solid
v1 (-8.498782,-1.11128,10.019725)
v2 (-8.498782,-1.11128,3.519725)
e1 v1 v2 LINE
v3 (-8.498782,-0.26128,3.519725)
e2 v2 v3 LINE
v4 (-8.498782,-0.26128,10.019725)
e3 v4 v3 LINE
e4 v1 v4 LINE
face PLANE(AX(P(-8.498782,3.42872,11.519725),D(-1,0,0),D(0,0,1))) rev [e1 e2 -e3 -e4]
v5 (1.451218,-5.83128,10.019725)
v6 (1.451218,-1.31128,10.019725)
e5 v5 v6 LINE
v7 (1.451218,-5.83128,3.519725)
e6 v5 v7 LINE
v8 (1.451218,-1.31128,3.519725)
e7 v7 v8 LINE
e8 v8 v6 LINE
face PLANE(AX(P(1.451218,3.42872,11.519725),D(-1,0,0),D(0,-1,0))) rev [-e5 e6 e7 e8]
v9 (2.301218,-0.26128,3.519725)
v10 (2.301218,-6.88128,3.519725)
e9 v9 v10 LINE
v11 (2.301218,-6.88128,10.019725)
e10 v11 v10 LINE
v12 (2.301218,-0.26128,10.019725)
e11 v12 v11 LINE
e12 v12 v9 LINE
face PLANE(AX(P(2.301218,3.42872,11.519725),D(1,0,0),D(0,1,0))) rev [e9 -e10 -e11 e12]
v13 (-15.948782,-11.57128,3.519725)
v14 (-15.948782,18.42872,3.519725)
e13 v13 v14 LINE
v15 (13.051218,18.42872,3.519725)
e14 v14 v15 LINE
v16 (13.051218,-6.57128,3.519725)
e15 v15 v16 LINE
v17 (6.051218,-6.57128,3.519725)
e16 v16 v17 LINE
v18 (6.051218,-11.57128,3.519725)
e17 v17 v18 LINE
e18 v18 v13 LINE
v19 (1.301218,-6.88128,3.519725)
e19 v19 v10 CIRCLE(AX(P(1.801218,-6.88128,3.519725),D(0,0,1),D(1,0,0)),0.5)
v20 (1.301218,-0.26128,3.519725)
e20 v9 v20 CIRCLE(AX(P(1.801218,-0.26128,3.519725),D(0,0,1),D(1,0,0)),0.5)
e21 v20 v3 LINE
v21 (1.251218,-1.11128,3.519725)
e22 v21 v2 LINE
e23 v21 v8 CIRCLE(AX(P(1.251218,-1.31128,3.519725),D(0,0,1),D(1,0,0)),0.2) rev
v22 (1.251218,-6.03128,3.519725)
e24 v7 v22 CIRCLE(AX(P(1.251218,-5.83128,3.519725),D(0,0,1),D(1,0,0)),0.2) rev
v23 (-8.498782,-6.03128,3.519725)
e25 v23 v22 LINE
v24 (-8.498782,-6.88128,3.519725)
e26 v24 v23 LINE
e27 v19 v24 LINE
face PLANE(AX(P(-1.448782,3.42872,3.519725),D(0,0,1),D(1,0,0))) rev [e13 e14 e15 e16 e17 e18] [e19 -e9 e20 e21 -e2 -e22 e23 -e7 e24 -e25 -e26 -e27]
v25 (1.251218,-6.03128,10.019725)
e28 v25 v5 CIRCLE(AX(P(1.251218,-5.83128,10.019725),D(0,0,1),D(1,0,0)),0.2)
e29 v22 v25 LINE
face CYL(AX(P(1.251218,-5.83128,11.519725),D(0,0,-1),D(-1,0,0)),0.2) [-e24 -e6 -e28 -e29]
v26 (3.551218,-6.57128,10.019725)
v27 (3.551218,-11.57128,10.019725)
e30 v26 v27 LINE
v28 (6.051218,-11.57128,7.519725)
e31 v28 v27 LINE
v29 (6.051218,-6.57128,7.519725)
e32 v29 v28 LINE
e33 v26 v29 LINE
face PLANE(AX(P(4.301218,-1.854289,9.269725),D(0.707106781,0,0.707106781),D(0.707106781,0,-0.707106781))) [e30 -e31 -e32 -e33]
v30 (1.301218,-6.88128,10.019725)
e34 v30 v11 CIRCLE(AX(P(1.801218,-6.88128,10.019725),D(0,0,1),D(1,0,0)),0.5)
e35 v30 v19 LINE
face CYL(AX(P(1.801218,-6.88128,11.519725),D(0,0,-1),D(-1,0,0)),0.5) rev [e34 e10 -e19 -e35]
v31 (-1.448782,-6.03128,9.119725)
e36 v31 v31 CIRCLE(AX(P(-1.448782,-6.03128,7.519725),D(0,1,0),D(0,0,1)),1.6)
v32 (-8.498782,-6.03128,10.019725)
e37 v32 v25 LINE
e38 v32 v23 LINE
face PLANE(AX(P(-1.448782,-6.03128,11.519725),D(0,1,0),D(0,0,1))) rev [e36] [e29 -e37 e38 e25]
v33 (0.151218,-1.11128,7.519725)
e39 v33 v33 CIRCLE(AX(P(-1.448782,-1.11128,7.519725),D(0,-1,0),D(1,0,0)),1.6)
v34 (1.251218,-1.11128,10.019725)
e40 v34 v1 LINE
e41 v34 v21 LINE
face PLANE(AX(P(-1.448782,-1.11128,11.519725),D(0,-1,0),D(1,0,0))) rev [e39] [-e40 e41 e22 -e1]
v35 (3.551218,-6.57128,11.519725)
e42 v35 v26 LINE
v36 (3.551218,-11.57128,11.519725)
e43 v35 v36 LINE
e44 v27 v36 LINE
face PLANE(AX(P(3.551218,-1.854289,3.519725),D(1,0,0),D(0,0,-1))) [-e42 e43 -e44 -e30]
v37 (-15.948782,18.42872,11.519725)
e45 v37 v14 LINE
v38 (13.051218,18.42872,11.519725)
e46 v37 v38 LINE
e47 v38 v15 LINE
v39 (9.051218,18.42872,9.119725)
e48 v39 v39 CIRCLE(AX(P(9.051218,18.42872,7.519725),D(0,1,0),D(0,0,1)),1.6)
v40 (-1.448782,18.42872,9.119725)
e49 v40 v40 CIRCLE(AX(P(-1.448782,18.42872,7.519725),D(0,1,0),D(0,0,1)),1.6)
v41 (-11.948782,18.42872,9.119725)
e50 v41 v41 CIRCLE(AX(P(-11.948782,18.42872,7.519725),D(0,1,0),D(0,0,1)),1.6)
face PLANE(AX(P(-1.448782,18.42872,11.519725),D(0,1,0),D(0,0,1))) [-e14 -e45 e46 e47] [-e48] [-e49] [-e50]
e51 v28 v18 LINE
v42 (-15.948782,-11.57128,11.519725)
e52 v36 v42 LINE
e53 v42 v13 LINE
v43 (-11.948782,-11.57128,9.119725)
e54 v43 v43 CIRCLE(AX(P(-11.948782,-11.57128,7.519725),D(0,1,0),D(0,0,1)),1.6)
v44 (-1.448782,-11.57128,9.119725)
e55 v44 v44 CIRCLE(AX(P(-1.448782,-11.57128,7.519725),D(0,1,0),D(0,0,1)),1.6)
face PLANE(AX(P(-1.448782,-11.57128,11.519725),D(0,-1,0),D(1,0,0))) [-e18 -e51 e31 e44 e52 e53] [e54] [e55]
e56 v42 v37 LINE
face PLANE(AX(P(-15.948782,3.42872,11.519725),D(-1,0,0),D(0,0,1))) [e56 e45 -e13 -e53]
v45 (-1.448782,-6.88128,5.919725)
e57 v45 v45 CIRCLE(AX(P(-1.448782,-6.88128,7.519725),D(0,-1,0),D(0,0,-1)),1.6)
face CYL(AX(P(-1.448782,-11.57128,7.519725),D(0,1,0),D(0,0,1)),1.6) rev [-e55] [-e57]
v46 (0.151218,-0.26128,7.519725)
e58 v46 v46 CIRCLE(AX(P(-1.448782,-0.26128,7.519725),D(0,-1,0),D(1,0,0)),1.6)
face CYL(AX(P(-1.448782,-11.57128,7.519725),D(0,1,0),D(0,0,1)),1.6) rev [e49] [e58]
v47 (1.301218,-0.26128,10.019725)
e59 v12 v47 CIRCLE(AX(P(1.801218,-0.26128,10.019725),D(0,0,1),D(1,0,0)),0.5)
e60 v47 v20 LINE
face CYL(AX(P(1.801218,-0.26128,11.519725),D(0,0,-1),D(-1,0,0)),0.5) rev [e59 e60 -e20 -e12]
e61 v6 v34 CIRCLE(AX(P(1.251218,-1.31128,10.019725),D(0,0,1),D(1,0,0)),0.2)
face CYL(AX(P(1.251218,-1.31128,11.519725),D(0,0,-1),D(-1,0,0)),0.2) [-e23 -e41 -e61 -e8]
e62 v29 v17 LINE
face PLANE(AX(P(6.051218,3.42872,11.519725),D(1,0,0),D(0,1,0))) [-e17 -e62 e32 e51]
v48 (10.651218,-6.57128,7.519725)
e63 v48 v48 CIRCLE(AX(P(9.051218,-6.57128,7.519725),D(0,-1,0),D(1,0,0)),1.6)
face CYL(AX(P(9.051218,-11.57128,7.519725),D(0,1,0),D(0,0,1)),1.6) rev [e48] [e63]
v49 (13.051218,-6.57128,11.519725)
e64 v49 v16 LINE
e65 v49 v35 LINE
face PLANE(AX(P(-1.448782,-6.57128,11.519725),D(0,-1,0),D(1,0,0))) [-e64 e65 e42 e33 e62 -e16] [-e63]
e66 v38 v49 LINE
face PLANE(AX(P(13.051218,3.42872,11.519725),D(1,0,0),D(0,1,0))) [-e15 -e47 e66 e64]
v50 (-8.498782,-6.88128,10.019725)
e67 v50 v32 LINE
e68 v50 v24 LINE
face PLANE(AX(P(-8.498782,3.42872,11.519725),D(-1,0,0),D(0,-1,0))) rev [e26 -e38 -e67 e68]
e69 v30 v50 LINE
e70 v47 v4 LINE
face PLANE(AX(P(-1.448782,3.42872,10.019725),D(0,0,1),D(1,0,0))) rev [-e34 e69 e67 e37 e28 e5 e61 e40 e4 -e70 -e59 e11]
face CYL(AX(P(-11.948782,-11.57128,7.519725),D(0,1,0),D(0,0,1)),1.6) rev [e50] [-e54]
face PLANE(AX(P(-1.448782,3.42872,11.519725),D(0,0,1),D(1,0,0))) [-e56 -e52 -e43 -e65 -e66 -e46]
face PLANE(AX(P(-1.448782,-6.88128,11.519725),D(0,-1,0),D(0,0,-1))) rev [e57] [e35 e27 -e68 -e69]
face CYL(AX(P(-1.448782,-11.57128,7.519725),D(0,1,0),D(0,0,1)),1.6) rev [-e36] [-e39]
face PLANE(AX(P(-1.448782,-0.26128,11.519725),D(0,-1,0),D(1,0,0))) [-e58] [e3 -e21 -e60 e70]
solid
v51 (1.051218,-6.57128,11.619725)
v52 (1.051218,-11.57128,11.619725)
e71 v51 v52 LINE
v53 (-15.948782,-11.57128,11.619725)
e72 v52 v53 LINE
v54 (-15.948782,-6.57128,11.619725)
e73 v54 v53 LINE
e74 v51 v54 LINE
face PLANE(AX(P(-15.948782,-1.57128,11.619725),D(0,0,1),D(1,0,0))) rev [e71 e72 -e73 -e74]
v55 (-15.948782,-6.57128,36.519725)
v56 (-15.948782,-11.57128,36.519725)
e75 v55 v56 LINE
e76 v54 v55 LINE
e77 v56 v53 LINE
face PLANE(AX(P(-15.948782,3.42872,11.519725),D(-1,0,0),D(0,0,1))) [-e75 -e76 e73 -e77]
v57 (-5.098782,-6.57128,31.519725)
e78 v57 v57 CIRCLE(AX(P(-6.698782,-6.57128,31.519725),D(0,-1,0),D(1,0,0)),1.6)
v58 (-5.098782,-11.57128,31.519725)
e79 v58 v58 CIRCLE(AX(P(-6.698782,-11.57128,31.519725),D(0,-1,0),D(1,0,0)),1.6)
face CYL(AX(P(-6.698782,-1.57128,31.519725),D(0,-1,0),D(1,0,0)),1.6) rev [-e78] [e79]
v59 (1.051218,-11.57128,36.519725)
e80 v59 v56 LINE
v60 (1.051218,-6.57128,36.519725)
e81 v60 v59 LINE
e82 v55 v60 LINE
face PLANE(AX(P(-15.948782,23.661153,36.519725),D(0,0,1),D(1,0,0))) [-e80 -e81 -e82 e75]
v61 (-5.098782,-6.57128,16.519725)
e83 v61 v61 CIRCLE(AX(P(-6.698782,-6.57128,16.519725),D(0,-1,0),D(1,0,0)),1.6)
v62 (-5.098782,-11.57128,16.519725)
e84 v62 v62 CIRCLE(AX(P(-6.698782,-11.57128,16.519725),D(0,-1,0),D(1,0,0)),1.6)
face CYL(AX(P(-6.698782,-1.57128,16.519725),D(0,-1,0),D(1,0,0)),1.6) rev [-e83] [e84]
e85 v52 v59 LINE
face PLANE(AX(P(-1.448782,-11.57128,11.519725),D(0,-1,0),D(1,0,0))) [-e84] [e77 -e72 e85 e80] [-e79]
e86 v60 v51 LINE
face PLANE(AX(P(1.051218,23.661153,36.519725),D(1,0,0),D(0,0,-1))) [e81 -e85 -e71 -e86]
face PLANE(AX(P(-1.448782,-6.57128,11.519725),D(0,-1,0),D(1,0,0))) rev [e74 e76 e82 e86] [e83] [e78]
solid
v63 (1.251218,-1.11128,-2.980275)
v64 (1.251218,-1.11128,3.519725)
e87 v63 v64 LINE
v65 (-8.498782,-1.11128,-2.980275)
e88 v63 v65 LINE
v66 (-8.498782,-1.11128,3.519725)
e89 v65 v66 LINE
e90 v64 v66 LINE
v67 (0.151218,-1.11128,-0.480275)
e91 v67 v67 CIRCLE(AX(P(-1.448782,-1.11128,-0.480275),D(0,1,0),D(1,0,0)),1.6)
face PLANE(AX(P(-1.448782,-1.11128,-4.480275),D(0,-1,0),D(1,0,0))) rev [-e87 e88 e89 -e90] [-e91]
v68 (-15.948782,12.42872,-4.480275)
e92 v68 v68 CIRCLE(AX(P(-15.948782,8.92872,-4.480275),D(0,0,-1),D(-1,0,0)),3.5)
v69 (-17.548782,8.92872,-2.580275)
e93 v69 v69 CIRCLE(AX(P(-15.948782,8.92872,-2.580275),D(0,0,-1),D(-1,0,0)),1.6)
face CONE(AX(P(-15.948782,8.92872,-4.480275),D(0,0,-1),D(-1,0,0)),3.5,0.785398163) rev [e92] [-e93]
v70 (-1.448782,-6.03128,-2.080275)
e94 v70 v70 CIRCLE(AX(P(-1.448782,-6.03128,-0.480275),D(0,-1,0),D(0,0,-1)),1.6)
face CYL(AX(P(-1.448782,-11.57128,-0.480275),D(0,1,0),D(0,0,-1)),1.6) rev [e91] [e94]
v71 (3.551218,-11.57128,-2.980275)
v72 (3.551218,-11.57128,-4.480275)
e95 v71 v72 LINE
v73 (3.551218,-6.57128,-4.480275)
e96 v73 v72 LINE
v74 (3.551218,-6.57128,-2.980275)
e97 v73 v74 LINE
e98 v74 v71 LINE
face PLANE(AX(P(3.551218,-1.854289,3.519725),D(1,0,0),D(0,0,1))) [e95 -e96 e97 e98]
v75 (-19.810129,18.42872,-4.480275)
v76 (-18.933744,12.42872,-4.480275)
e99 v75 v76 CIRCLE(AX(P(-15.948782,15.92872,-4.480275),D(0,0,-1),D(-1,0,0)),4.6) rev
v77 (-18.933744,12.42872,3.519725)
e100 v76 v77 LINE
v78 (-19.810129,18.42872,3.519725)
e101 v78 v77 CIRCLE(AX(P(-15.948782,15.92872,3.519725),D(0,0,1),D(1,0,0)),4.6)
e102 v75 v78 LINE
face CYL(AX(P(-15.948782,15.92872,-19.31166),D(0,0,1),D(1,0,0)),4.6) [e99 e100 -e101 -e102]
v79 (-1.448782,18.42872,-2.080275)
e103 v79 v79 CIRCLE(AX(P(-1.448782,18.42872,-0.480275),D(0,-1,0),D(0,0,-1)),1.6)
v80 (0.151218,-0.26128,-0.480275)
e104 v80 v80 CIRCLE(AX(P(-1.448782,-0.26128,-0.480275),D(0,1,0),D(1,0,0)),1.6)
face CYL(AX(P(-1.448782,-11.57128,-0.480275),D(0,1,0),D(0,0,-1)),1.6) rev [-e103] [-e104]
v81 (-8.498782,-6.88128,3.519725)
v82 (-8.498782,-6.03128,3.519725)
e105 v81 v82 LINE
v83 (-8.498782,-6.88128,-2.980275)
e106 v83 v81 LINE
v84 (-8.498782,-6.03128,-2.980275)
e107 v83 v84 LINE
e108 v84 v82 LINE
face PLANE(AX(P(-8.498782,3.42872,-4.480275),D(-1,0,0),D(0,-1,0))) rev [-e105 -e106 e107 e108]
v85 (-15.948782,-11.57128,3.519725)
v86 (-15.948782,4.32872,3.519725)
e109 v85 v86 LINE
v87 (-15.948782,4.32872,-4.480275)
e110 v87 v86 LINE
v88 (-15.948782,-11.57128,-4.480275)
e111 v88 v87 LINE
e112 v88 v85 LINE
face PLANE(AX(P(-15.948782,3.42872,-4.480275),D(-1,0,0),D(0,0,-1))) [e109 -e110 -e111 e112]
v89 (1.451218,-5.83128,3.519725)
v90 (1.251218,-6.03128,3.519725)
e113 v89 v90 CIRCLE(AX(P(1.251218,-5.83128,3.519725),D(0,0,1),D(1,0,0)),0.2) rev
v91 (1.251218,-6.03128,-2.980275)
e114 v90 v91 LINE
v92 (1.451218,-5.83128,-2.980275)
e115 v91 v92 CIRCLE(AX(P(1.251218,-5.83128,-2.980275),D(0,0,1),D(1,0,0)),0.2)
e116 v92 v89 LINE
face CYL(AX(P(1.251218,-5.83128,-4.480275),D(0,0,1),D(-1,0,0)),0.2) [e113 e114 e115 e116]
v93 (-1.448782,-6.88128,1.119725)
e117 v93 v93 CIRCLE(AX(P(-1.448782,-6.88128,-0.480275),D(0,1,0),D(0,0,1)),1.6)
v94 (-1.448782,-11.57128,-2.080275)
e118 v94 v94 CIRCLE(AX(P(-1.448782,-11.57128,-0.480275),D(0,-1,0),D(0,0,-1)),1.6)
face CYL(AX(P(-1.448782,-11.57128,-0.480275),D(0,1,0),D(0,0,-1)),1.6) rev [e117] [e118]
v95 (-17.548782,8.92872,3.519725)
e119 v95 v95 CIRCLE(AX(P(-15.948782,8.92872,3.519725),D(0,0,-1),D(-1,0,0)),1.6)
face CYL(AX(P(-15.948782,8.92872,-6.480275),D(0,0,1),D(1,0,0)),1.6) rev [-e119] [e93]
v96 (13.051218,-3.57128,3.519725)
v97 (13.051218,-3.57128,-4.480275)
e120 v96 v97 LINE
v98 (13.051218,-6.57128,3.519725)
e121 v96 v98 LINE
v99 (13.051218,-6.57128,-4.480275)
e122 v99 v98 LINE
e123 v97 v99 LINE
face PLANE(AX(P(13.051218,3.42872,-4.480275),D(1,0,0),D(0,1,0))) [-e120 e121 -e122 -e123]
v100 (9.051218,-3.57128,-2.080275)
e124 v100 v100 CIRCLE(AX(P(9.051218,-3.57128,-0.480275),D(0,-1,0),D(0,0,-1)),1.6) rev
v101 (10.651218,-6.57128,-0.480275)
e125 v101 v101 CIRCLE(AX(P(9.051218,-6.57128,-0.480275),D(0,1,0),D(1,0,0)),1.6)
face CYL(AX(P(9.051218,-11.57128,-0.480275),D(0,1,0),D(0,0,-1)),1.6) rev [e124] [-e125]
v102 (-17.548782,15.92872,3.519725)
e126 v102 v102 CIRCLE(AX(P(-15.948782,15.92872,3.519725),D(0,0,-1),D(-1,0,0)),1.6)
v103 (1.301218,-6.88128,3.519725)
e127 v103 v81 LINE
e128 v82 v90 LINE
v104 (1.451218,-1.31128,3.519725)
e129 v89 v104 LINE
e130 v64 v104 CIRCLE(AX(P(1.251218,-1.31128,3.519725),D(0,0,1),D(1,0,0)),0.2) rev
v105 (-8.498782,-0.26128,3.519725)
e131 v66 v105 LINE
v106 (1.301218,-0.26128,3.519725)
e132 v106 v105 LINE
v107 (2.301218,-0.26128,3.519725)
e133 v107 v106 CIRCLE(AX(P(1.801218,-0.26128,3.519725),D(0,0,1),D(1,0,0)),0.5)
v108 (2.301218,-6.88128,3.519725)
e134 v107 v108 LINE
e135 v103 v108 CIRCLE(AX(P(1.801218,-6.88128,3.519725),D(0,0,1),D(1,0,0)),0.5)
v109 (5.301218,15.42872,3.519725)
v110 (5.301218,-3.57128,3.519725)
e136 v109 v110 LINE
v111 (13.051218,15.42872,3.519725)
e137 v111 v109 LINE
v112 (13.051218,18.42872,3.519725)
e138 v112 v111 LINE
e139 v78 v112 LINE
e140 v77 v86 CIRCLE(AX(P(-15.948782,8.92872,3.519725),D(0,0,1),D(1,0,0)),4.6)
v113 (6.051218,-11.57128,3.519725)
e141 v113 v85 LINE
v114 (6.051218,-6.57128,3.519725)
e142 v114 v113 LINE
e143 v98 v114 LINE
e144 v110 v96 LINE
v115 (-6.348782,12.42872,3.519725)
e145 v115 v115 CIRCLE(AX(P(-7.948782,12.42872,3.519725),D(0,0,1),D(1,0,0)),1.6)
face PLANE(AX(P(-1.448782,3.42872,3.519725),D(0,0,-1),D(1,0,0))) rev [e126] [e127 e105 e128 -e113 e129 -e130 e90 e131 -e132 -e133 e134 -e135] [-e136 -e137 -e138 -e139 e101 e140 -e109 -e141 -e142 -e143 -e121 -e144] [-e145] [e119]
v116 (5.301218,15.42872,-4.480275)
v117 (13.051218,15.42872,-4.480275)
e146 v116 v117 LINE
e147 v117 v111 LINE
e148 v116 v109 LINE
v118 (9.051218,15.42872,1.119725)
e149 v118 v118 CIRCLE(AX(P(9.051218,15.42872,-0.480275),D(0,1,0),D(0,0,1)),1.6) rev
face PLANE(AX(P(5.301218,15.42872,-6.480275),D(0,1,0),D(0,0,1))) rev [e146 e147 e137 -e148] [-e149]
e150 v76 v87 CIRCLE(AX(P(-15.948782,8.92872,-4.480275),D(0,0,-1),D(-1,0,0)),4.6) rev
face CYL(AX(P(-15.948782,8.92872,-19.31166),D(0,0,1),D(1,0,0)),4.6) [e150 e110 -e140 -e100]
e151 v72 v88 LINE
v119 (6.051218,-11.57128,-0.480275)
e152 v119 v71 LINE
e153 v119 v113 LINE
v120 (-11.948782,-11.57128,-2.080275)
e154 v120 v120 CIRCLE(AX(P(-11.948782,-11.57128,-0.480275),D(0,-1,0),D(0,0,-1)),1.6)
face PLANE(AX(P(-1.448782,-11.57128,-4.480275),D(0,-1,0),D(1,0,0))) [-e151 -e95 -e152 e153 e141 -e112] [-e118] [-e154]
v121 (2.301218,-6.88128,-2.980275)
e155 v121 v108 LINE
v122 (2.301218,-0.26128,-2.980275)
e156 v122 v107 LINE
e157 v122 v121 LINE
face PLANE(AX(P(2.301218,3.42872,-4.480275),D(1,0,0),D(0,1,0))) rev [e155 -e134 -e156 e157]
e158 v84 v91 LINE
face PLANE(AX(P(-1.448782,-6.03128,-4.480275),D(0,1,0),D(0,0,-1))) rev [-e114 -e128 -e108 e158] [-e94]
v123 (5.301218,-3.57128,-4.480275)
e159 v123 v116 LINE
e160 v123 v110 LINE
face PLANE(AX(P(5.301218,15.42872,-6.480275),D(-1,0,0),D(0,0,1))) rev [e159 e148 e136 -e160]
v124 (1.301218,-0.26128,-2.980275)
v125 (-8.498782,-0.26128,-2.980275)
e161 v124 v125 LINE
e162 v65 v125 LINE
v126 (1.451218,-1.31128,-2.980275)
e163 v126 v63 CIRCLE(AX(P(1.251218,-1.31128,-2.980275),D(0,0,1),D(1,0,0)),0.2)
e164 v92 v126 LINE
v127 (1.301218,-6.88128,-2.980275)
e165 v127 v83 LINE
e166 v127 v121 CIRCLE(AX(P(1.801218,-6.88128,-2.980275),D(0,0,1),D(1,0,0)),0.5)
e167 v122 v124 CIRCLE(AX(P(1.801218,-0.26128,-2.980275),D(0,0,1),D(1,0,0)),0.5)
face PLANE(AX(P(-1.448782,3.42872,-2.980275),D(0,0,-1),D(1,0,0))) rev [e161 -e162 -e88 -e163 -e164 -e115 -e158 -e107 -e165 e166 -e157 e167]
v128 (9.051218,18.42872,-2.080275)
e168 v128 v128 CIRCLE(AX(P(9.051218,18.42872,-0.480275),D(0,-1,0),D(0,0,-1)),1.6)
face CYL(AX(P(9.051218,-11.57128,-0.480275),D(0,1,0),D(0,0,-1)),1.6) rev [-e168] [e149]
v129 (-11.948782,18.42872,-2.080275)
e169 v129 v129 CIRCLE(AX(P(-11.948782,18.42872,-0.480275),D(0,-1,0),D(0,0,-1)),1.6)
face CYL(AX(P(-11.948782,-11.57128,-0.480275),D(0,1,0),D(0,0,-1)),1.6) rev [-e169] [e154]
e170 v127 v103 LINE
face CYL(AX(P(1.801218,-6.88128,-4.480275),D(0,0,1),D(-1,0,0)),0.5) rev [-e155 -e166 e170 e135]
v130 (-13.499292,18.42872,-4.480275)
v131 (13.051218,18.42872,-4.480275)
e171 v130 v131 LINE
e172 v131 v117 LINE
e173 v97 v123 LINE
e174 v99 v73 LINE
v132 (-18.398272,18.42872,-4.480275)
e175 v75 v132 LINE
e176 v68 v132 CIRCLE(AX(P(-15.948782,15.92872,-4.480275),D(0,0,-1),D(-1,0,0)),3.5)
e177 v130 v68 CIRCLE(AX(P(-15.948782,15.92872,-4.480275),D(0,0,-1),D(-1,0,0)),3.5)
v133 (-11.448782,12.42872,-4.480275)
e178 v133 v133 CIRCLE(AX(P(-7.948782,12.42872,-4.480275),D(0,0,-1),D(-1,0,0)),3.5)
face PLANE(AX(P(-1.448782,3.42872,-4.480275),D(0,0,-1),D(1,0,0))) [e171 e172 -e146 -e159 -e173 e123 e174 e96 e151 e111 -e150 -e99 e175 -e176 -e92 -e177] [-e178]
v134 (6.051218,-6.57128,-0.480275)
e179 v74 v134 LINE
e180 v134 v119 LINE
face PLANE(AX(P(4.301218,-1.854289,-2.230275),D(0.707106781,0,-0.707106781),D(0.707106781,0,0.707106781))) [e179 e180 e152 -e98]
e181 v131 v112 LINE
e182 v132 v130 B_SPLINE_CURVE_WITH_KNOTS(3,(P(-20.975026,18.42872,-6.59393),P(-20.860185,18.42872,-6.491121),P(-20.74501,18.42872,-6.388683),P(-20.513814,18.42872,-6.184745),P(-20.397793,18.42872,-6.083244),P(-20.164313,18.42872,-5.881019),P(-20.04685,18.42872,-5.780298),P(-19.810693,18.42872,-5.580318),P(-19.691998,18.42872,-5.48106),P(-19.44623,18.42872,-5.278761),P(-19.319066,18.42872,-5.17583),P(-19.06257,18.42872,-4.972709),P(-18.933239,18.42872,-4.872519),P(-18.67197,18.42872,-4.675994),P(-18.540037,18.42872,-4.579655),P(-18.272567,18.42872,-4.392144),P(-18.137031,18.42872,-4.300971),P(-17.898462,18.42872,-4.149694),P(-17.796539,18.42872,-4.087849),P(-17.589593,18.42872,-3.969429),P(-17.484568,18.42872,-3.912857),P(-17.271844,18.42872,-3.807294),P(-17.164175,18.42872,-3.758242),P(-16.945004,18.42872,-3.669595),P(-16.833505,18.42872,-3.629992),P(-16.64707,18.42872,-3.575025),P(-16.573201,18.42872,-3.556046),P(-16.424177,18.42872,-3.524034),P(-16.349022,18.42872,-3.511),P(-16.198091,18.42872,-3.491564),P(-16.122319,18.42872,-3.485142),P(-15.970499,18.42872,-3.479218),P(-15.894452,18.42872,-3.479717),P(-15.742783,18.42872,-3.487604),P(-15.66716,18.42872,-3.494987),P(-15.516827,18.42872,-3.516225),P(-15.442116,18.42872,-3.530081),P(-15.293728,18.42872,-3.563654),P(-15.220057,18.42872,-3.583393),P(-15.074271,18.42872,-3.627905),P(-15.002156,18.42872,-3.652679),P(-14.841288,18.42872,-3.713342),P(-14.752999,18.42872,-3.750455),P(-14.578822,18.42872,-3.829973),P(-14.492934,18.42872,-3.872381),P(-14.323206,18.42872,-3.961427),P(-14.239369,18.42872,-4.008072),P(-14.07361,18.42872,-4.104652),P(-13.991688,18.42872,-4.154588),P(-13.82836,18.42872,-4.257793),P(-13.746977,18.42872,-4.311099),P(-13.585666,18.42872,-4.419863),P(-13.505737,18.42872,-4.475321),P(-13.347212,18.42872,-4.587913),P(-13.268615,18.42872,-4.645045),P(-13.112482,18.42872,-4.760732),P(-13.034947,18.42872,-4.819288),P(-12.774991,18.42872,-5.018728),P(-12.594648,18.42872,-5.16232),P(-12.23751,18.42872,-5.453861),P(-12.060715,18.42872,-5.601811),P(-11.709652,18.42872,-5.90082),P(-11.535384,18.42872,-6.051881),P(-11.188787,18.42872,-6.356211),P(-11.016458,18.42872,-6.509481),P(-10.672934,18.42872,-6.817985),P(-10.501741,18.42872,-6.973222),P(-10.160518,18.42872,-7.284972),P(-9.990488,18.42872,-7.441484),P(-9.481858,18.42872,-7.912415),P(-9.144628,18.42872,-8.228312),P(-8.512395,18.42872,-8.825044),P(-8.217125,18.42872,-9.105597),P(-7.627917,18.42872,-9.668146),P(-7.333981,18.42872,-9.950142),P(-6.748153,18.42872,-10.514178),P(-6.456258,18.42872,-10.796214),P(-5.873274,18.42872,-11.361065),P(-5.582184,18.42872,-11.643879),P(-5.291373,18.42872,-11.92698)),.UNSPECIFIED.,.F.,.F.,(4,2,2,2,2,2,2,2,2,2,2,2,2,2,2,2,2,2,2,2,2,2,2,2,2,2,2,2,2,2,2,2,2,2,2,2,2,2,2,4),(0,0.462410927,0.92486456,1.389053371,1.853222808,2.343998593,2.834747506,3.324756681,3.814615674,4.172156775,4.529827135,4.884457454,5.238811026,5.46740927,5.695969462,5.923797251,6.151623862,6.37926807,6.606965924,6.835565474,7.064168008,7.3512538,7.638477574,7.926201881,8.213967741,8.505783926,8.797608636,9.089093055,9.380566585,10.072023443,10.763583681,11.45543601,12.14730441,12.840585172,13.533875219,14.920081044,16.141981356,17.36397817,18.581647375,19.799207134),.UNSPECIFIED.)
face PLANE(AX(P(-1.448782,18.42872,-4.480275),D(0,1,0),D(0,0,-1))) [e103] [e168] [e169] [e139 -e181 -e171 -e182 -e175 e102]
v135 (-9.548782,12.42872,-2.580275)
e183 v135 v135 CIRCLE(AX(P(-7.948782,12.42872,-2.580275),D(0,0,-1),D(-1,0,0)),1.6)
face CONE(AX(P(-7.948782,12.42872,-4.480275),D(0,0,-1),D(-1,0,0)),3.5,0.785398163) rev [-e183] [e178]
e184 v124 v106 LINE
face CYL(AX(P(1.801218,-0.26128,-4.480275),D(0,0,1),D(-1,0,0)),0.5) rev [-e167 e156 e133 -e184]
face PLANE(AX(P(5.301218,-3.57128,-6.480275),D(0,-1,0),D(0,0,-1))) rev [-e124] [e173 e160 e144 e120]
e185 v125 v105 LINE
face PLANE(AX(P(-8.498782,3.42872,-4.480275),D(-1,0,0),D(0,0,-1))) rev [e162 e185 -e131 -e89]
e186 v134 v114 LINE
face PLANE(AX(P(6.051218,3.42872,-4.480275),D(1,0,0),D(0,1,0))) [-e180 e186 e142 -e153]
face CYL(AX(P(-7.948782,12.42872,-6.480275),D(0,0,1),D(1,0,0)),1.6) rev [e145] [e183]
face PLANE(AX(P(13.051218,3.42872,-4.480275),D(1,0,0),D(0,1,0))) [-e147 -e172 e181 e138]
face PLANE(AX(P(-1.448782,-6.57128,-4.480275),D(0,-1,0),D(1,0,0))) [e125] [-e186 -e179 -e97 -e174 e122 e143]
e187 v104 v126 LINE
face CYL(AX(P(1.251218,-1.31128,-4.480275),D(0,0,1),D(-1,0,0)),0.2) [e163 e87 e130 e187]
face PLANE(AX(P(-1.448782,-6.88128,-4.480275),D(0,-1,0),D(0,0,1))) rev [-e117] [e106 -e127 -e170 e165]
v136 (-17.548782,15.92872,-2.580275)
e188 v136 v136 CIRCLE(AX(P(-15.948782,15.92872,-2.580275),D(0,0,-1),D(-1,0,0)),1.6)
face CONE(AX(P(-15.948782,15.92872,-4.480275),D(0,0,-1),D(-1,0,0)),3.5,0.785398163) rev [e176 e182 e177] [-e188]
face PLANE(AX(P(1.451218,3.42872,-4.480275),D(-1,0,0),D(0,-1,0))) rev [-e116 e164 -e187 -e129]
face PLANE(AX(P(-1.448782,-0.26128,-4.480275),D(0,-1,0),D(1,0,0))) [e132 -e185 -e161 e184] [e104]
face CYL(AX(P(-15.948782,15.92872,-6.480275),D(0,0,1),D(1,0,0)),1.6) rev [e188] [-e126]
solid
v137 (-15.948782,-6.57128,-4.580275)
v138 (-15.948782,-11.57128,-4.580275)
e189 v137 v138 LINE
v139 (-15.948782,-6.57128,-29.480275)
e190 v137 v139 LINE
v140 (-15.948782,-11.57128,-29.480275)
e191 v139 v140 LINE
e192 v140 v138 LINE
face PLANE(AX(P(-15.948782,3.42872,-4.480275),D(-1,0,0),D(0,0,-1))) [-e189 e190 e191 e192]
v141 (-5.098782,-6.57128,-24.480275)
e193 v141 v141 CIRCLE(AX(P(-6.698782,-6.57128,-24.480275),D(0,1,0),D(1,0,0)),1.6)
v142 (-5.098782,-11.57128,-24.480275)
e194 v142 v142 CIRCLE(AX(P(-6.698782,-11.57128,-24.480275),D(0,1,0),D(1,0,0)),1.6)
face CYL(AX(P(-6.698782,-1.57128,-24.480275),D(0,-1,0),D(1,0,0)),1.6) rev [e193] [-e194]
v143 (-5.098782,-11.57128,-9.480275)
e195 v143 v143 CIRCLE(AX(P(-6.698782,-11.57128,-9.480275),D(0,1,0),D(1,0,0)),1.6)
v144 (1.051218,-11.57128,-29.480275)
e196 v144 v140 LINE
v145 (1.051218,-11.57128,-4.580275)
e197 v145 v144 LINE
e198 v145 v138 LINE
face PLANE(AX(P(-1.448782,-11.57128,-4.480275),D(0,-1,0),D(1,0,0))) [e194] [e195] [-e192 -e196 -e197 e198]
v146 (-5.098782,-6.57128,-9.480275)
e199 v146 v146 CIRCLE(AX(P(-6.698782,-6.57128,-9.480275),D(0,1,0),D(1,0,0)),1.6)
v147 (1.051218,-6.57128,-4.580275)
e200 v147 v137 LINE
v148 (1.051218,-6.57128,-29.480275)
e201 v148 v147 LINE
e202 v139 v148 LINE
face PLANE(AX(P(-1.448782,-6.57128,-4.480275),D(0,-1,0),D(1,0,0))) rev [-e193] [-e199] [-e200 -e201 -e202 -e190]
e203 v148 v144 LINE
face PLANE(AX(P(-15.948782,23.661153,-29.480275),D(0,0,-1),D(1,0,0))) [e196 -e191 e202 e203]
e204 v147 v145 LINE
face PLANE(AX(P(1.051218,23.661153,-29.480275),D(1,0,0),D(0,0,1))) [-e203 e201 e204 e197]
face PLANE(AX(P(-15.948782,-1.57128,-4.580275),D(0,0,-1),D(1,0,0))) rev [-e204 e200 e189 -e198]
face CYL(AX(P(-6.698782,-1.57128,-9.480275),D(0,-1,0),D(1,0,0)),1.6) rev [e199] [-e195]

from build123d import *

# Parameters (mm, degrees)
MIRROR_START             = -11.571280035
MIRROR_1_OUTLINE_W       = 17
MIRROR_1_OUTLINE_H       = 24.9
MIRROR_1_OUTLINE_R       = 1.6
MIRROR_1_DEPTH           = 5
MIRROR_START_2           = 0.238719965
MIRROR_1_2_OUTLINE_W     = 29
MIRROR_1_2_OUTLINE_H     = 8
MIRROR_1_2_OUTLINE_R     = 1.6
MIRROR_1_2_DEPTH         = 18.19
MIRROR_1_3_OUTLINE_R     = 1.6
MIRROR_1_3_DEPTH         = 30
MIRROR_START_3           = -5.831280035
MIRROR_1_4_OUTLINE_R     = 1.6
MIRROR_1_4_OUTLINE_W     = 9.95
MIRROR_1_4_OUTLINE_H     = 6.5
MIRROR_1_4_DEPTH         = 4.52
MIRROR_1_5_OUTLINE_W     = 10.8
MIRROR_1_5_OUTLINE_H     = 6.5
MIRROR_1_5_OUTLINE_R     = 1.6
MIRROR_1_5_DEPTH         = 4.19
MIRROR_START_4           = -6.571280035
MIRROR_1_6_OUTLINE_R     = 1.6
MIRROR_1_6_DEPTH         = 25
MIRROR_START_5           = -2.980274528
MIRROR_1_7_DEPTH         = 6.5
MIRROR_START_6           = -7.381280035
MIRROR_1_8_OUTLINE_R     = 1.6
MIRROR_1_8_DEPTH         = 7.62
MIRROR_1_9_OUTLINE_W     = 29
MIRROR_1_9_OUTLINE_H     = 8
MIRROR_1_9_OUTLINE_R     = 1.6
MIRROR_1_9_DEPTH         = 18.19
MIRROR_1_10_OUTLINE_R    = 1.6
MIRROR_1_10_DEPTH        = 30
MIRROR_1_11_OUTLINE_R    = 1.6
MIRROR_1_11_OUTLINE_W    = 9.95
MIRROR_1_11_OUTLINE_H    = 6.5
MIRROR_1_11_DEPTH        = 4.52
MIRROR_1_12_OUTLINE_W    = 10.8
MIRROR_1_12_OUTLINE_H    = 6.5
MIRROR_1_12_OUTLINE_R    = 1.6
MIRROR_1_12_DEPTH        = 4.19
MIRROR_1_13_OUTLINE_R    = 1.6
MIRROR_1_13_DEPTH        = 25
MIRROR_START_7           = 3.519725472
MIRROR_1_14_DEPTH        = 6.5
MIRROR_1_15_OUTLINE_R    = 1.6
MIRROR_1_15_DEPTH        = 7.62
MIRROR_1_16_OUTLINE_W    = 17
MIRROR_1_16_OUTLINE_H    = 24.9
MIRROR_1_16_OUTLINE_R    = 1.6
MIRROR_1_16_DEPTH        = 5
SKETCH_8_R               = 1.6
SKETCH_8_W               = 15.5
SKETCH_8_H               = 19
CUT_EXTRUDE_1_DEPTH      = 10
CUT_EXTRUDE_2_DEPTH      = 10
EXTRUDE_1_DEPTH          = 8
HOLE_WIZARD_1_AT_2_COUNT = 2
HOLE_WIZARD_1_AT_2_PITCH = 7
HOLE_WIZARD_1_AT_3_COUNT = 2
HOLE_WIZARD_1_AT_3_PITCH = 8.732124598


with BuildPart() as part:
    # 镜向1: read off the stored shape, not the designer's step
    # 镜向1 outline → 镜向1 (new body)
    with BuildSketch(Plane(origin=(0, 0, 0), x_dir=(1, 0, 0), z_dir=(0, 1, 0)).offset(MIRROR_START)):
        with Locations((-7.448782051, 17.030274528)):
            Rectangle(MIRROR_1_OUTLINE_W, MIRROR_1_OUTLINE_H)
        with Locations((-6.698782051, 9.480274528)):
            Circle(MIRROR_1_OUTLINE_R, mode=Mode.SUBTRACT)
        with Locations((-6.698782051, 24.480274528)):
            Circle(MIRROR_1_OUTLINE_R, mode=Mode.SUBTRACT)
    extrude(amount=MIRROR_1_DEPTH)


with BuildPart() as body_2:
    # Mirror 1 2 outline → Mirror 1 2 (new body)
    with BuildSketch(Plane(origin=(0, 0, 0), x_dir=(1, 0, 0), z_dir=(0, 1, 0)).offset(MIRROR_START_2)):
        with Locations((-1.448782051, 0.480274528)):
            Rectangle(MIRROR_1_2_OUTLINE_W, MIRROR_1_2_OUTLINE_H)
        with Locations((9.051217949, 0.480274528)):
            Circle(MIRROR_1_2_OUTLINE_R, mode=Mode.SUBTRACT)
        with Locations((-11.948782051, 0.480274528)):
            Circle(MIRROR_1_2_OUTLINE_R, mode=Mode.SUBTRACT)
        with Locations((-1.448782051, 0.480274528)):
            Circle(MIRROR_1_2_OUTLINE_R, mode=Mode.SUBTRACT)
    extrude(amount=MIRROR_1_2_DEPTH)

    # Mirror 1 3 outline → Mirror 1 3 (add)
    with BuildSketch(Plane(origin=(0, 0, 0), x_dir=(1, 0, 0), z_dir=(0, 1, 0)).offset(MIRROR_START)):
        Polygon((3.551217949, 2.980274528), (3.551217949, 4.480274528), (-15.948782051, 4.480274528), (-15.948782051, -3.519725472), (-8.498782051, -3.519725472), (-8.498782051, 2.980274528), (2.301217949, 2.980274528), (2.301217949, -3.519725472), (6.051217949, -3.519725472), (6.051217949, 0.480274528), align=None)
        with Locations((-11.948782051, 0.480274528)):
            Circle(MIRROR_1_3_OUTLINE_R, mode=Mode.SUBTRACT)
    extrude(amount=MIRROR_1_3_DEPTH)

    # Mirror 1 4 outline → Mirror 1 4 (add)
    # profile 1 of 2: a face of its own
    with BuildSketch(Plane(origin=(0, 0, 0), x_dir=(1, 0, 0), z_dir=(0, 1, 0)).offset(MIRROR_START_3)):
        Polygon((13.051217949, -3.519725472), (13.051217949, 4.480274528), (3.551217949, 4.480274528), (3.551217949, 2.980274528), (6.051217949, 0.480274528), (6.051217949, -3.519725472), align=None)
        with Locations((9.051217949, 0.480274528)):
            Circle(MIRROR_1_4_OUTLINE_R, mode=Mode.SUBTRACT)
    # profile 2 of 2: a face of its own
    with BuildSketch(Plane(origin=(0, 0, 0), x_dir=(1, 0, 0), z_dir=(0, 1, 0)).offset(MIRROR_START_3)):
        with Locations((-3.523782051, -0.269725472)):
            Rectangle(MIRROR_1_4_OUTLINE_W, MIRROR_1_4_OUTLINE_H)
        with Locations((-1.448782051, 0.480274528)):
            Circle(MIRROR_1_4_OUTLINE_R, mode=Mode.SUBTRACT)
    extrude(amount=MIRROR_1_4_DEPTH)

    # Mirror 1 5 outline → Mirror 1 5 (add)
    with BuildSketch(Plane(origin=(0, 0, 0), x_dir=(1, 0, 0), z_dir=(0, 1, 0)).offset(MIRROR_START)):
        with Locations((-3.098782051, -0.269725472)):
            Rectangle(MIRROR_1_5_OUTLINE_W, MIRROR_1_5_OUTLINE_H)
        with Locations((-1.448782051, 0.480274528)):
            Circle(MIRROR_1_5_OUTLINE_R, mode=Mode.SUBTRACT)
    extrude(amount=MIRROR_1_5_DEPTH)

    # Mirror 1 6 outline → Mirror 1 6 (add)
    with BuildSketch(Plane(origin=(0, 0, 0), x_dir=(1, 0, 0), z_dir=(0, 1, 0)).offset(MIRROR_START_4)):
        Polygon((13.051217949, -3.519725472), (13.051217949, 4.480274528), (3.551217949, 4.480274528), (3.551217949, 2.980274528), (6.051217949, 0.480274528), (6.051217949, -3.519725472), align=None)
        with Locations((9.051217949, 0.480274528)):
            Circle(MIRROR_1_6_OUTLINE_R, mode=Mode.SUBTRACT)
    extrude(amount=MIRROR_1_6_DEPTH)

    # Mirror 1 7 outline → Mirror 1 7 (add)
    with BuildSketch(Plane.XY.offset(MIRROR_START_5)):
        with BuildLine():
            Line((1.251217949, -1.111280035), (-8.498782051, -1.111280035))
            Line((-8.498782051, -1.111280035), (-8.498782051, -1.311280035))
            Line((-8.498782051, -1.311280035), (1.451217949, -1.311280035))
            ThreePointArc((1.451217949, -1.311280035), (1.392639305, -1.169858679), (1.251217949, -1.111280035))
        make_face()
        with BuildLine():
            ThreePointArc((1.301217949, -0.261280035), (1.447664558, 0.092273356), (1.801217949, 0.238719965))
            Line((1.801217949, 0.238719965), (-8.498782051, 0.238719965))
            Line((-8.498782051, 0.238719965), (-8.498782051, -0.261280035))
            Line((-8.498782051, -0.261280035), (1.301217949, -0.261280035))
        make_face()
        with BuildLine():
            Line((-8.498782051, -5.831280035), (-8.498782051, -6.031280035))
            Line((-8.498782051, -6.031280035), (1.251217949, -6.031280035))
            ThreePointArc((1.251217949, -6.031280035), (1.392639305, -5.972701391), (1.451217949, -5.831280035))
            Line((1.451217949, -5.831280035), (-8.498782051, -5.831280035))
        make_face()
        with BuildLine():
            Line((-8.498782051, -7.381280035), (1.801217949, -7.381280035))
            ThreePointArc((1.801217949, -7.381280035), (1.447664558, -7.234833426), (1.301217949, -6.881280035))
            Line((1.301217949, -6.881280035), (-8.498782051, -6.881280035))
            Line((-8.498782051, -6.881280035), (-8.498782051, -7.381280035))
        make_face()
        with BuildLine():
            Line((2.301217949, -7.381280035), (2.301217949, -6.881280035))
            ThreePointArc((2.301217949, -6.881280035), (2.15477134, -7.234833426), (1.801217949, -7.381280035))
            Line((1.801217949, -7.381280035), (2.301217949, -7.381280035))
        make_face()
        with BuildLine():
            ThreePointArc((1.801217949, 0.238719965), (2.15477134, 0.092273356), (2.301217949, -0.261280035))
            Line((2.301217949, -0.261280035), (2.301217949, 0.238719965))
            Line((2.301217949, 0.238719965), (1.801217949, 0.238719965))
        make_face()
    extrude(amount=MIRROR_1_7_DEPTH)

    # Mirror 1 8 outline → Mirror 1 8 (cut)
    with BuildSketch(Plane(origin=(0, 0, 0), x_dir=(1, 0, 0), z_dir=(0, 1, 0)).offset(MIRROR_START_6)):
        with Locations((-1.448782051, 0.480274528)):
            Circle(MIRROR_1_8_OUTLINE_R)
    extrude(amount=MIRROR_1_8_DEPTH, mode=Mode.SUBTRACT)

    # Sketch 8 → 切除-拉伸1 (cut)
    with BuildSketch(Plane.XY.offset(3.519725472)):
        with Locations((-7.948782051, 12.428719965)):
            Circle(SKETCH_8_R)
        with Locations((13.051217949, 5.928719965)):
            Rectangle(SKETCH_8_W, SKETCH_8_H)
    extrude(amount=-CUT_EXTRUDE_1_DEPTH, mode=Mode.SUBTRACT)

    # Sketch 9 → 切除-拉伸2 (cut)
    with BuildSketch(Plane.XY.offset(3.519725472)):
        with BuildLine():
            Line((-15.948782051, 7.328719965), (-15.948782051, 10.528719965))
            ThreePointArc((-15.948782051, 10.528719965), (-17.548782051, 8.928719965), (-15.948782051, 7.328719965))
        make_face()
        with BuildLine():
            ThreePointArc((-14.348782051, 8.928719965), (-14.817411201, 10.060090815), (-15.948782051, 10.528719965))
            Line((-15.948782051, 10.528719965), (-15.948782051, 7.328719965))
            ThreePointArc((-15.948782051, 7.328719965), (-14.817411201, 7.797349115), (-14.348782051, 8.928719965))
        make_face()
        with BuildLine():
            Line((-15.948782051, 14.328719965), (-15.948782051, 17.528719965))
            ThreePointArc((-15.948782051, 17.528719965), (-17.548782051, 15.928719965), (-15.948782051, 14.328719965))
        make_face()
        with BuildLine():
            ThreePointArc((-14.348782051, 15.928719965), (-14.817411201, 17.060090815), (-15.948782051, 17.528719965))
            Line((-15.948782051, 17.528719965), (-15.948782051, 14.328719965))
            ThreePointArc((-15.948782051, 14.328719965), (-14.817411201, 14.797349115), (-14.348782051, 15.928719965))
        make_face()
    extrude(amount=-CUT_EXTRUDE_2_DEPTH, mode=Mode.SUBTRACT)

    # 草图9<3> → 凸台-拉伸1 (add)
    with BuildSketch(Plane.XY.offset(3.519725472)):
        with BuildLine():
            Line((-15.948782051, 17.528719965), (-15.948782051, 18.428719965))
            Line((-15.948782051, 18.428719965), (-19.810128966, 18.428719965))
            ThreePointArc((-19.810128966, 18.428719965), (-20.500483657, 15.263879763), (-18.933744362, 12.428719965))
            ThreePointArc((-18.933744362, 12.428719965), (-20.265030422, 7.338122593), (-15.948782051, 4.328719965))
            Line((-15.948782051, 4.328719965), (-15.948782051, 7.328719965))
            ThreePointArc((-15.948782051, 7.328719965), (-17.548782051, 8.928719965), (-15.948782051, 10.528719965))
            Line((-15.948782051, 10.528719965), (-15.948782051, 14.328719965))
            ThreePointArc((-15.948782051, 14.328719965), (-17.548782051, 15.928719965), (-15.948782051, 17.528719965))
        make_face()
    extrude(amount=-EXTRUDE_1_DEPTH)

    # Sketch 10 → 打孔尺寸(%根据十字)槽沉头木螺钉的类型1 (revolve, cut)
    with BuildSketch(Plane(origin=(-15.948782051, 8.928719965, -4.480274528), x_dir=(0, 1, 0), z_dir=(1, 0, 0))):
        Polygon((0, 0), (0, 41), (1.6, 41), (1.6, 1.9), (3.5, 0), align=None)
    hole_wizard_1 = revolve(axis=Axis((-15.948782051, 8.928719965, -10.830274528), (0, 0, 1)), mode=Mode.SUBTRACT)

    # 打孔尺寸(%根据十字)槽沉头木螺钉的类型1 at 2: 打孔尺寸(%根据十字)槽沉头木螺钉的类型1 ×2
    with Locations(*[(0, i * HOLE_WIZARD_1_AT_2_PITCH, 0) for i in range(1, HOLE_WIZARD_1_AT_2_COUNT)]):
        add(hole_wizard_1, mode=Mode.SUBTRACT)

    # 打孔尺寸(%根据十字)槽沉头木螺钉的类型1 at 3: 打孔尺寸(%根据十字)槽沉头木螺钉的类型1 ×2
    with Locations(*[Vector(0.9161573349021892, 0.4008188340197078, 0) * (i * HOLE_WIZARD_1_AT_3_PITCH) for i in range(1, HOLE_WIZARD_1_AT_3_COUNT)]):
        add(hole_wizard_1, mode=Mode.SUBTRACT)


with BuildPart() as body_3:
    # Mirror 1 9 outline → Mirror 1 9 (new body)
    with BuildSketch(Plane(origin=(0, 0, 0), x_dir=(1, 0, 0), z_dir=(0, 1, 0)).offset(MIRROR_START_2)):
        with Locations((-1.448782051, -7.519725472)):
            Rectangle(MIRROR_1_9_OUTLINE_W, MIRROR_1_9_OUTLINE_H)
        with Locations((-11.948782051, -7.519725472)):
            Circle(MIRROR_1_9_OUTLINE_R, mode=Mode.SUBTRACT)
        with Locations((-1.448782051, -7.519725472)):
            Circle(MIRROR_1_9_OUTLINE_R, mode=Mode.SUBTRACT)
        with Locations((9.051217949, -7.519725472)):
            Circle(MIRROR_1_9_OUTLINE_R, mode=Mode.SUBTRACT)
    extrude(amount=MIRROR_1_9_DEPTH)

    # Mirror 1 10 outline → Mirror 1 10 (add)
    with BuildSketch(Plane(origin=(0, 0, 0), x_dir=(1, 0, 0), z_dir=(0, 1, 0)).offset(MIRROR_START)):
        Polygon((-15.948782051, -3.519725472), (-15.948782051, -11.519725472), (3.551217949, -11.519725472), (3.551217949, -10.019725472), (6.051217949, -7.519725472), (6.051217949, -3.519725472), (2.301217949, -3.519725472), (2.301217949, -10.019725472), (-8.498782051, -10.019725472), (-8.498782051, -3.519725472), align=None)
        with Locations((-11.948782051, -7.519725472)):
            Circle(MIRROR_1_10_OUTLINE_R, mode=Mode.SUBTRACT)
    extrude(amount=MIRROR_1_10_DEPTH)

    # Mirror 1 11 outline → Mirror 1 11 (add)
    # profile 1 of 2: a face of its own
    with BuildSketch(Plane(origin=(0, 0, 0), x_dir=(1, 0, 0), z_dir=(0, 1, 0)).offset(MIRROR_START_3)):
        Polygon((3.551217949, -10.019725472), (3.551217949, -11.519725472), (13.051217949, -11.519725472), (13.051217949, -3.519725472), (6.051217949, -3.519725472), (6.051217949, -7.519725472), align=None)
        with Locations((9.051217949, -7.519725472)):
            Circle(MIRROR_1_11_OUTLINE_R, mode=Mode.SUBTRACT)
    # profile 2 of 2: a face of its own
    with BuildSketch(Plane(origin=(0, 0, 0), x_dir=(1, 0, 0), z_dir=(0, 1, 0)).offset(MIRROR_START_3)):
        with Locations((-3.523782051, -6.769725472)):
            Rectangle(MIRROR_1_11_OUTLINE_W, MIRROR_1_11_OUTLINE_H)
        with Locations((-1.448782051, -7.519725472)):
            Circle(MIRROR_1_11_OUTLINE_R, mode=Mode.SUBTRACT)
    extrude(amount=MIRROR_1_11_DEPTH)

    # Mirror 1 12 outline → Mirror 1 12 (add)
    with BuildSketch(Plane(origin=(0, 0, 0), x_dir=(1, 0, 0), z_dir=(0, 1, 0)).offset(MIRROR_START)):
        with Locations((-3.098782051, -6.769725472)):
            Rectangle(MIRROR_1_12_OUTLINE_W, MIRROR_1_12_OUTLINE_H)
        with Locations((-1.448782051, -7.519725472)):
            Circle(MIRROR_1_12_OUTLINE_R, mode=Mode.SUBTRACT)
    extrude(amount=MIRROR_1_12_DEPTH)

    # Mirror 1 13 outline → Mirror 1 13 (add)
    with BuildSketch(Plane(origin=(0, 0, 0), x_dir=(1, 0, 0), z_dir=(0, 1, 0)).offset(MIRROR_START_4)):
        Polygon((3.551217949, -10.019725472), (3.551217949, -11.519725472), (13.051217949, -11.519725472), (13.051217949, -3.519725472), (6.051217949, -3.519725472), (6.051217949, -7.519725472), align=None)
        with Locations((9.051217949, -7.519725472)):
            Circle(MIRROR_1_13_OUTLINE_R, mode=Mode.SUBTRACT)
    extrude(amount=MIRROR_1_13_DEPTH)

    # Mirror 1 14 outline → Mirror 1 14 (add)
    with BuildSketch(Plane.XY.offset(MIRROR_START_7)):
        with BuildLine():
            Line((-8.498782051, -0.261280035), (1.301217949, -0.261280035))
            ThreePointArc((1.301217949, -0.261280035), (1.447664558, 0.092273356), (1.801217949, 0.238719965))
            Line((1.801217949, 0.238719965), (-8.498782051, 0.238719965))
            Line((-8.498782051, 0.238719965), (-8.498782051, -0.261280035))
        make_face()
        with BuildLine():
            Line((1.251217949, -1.111280035), (-8.498782051, -1.111280035))
            Line((-8.498782051, -1.111280035), (-8.498782051, -1.311280035))
            Line((-8.498782051, -1.311280035), (1.451217949, -1.311280035))
            ThreePointArc((1.451217949, -1.311280035), (1.392639305, -1.169858679), (1.251217949, -1.111280035))
        make_face()
        with BuildLine():
            Line((-8.498782051, -5.831280035), (-8.498782051, -6.031280035))
            Line((-8.498782051, -6.031280035), (1.251217949, -6.031280035))
            ThreePointArc((1.251217949, -6.031280035), (1.392639305, -5.972701391), (1.451217949, -5.831280035))
            Line((1.451217949, -5.831280035), (-8.498782051, -5.831280035))
        make_face()
        with BuildLine():
            Line((-8.498782051, -7.381280035), (1.801217949, -7.381280035))
            ThreePointArc((1.801217949, -7.381280035), (1.447664558, -7.234833426), (1.301217949, -6.881280035))
            Line((1.301217949, -6.881280035), (-8.498782051, -6.881280035))
            Line((-8.498782051, -6.881280035), (-8.498782051, -7.381280035))
        make_face()
        with BuildLine():
            Line((2.301217949, -7.381280035), (2.301217949, -6.881280035))
            ThreePointArc((2.301217949, -6.881280035), (2.15477134, -7.234833426), (1.801217949, -7.381280035))
            Line((1.801217949, -7.381280035), (2.301217949, -7.381280035))
        make_face()
        with BuildLine():
            Line((2.301217949, 0.238719965), (1.801217949, 0.238719965))
            ThreePointArc((1.801217949, 0.238719965), (2.15477134, 0.092273356), (2.301217949, -0.261280035))
            Line((2.301217949, -0.261280035), (2.301217949, 0.238719965))
        make_face()
    extrude(amount=MIRROR_1_14_DEPTH)

    # Mirror 1 15 outline → Mirror 1 15 (cut)
    with BuildSketch(Plane(origin=(0, 0, 0), x_dir=(1, 0, 0), z_dir=(0, 1, 0)).offset(MIRROR_START_6)):
        with Locations((-1.448782051, -7.519725472)):
            Circle(MIRROR_1_15_OUTLINE_R)
    extrude(amount=MIRROR_1_15_DEPTH, mode=Mode.SUBTRACT)


with BuildPart() as body_4:
    # Mirror 1 16 outline → Mirror 1 16 (new body)
    with BuildSketch(Plane(origin=(0, 0, 0), x_dir=(1, 0, 0), z_dir=(0, 1, 0)).offset(MIRROR_START)):
        with Locations((-7.448782051, -24.069725472)):
            Rectangle(MIRROR_1_16_OUTLINE_W, MIRROR_1_16_OUTLINE_H)
        with Locations((-6.698782051, -31.519725472)):
            Circle(MIRROR_1_16_OUTLINE_R, mode=Mode.SUBTRACT)
        with Locations((-6.698782051, -16.519725472)):
            Circle(MIRROR_1_16_OUTLINE_R, mode=Mode.SUBTRACT)
    extrude(amount=MIRROR_1_16_DEPTH)


solid = Compound([part.part, body_2.part, body_3.part, body_4.part])
